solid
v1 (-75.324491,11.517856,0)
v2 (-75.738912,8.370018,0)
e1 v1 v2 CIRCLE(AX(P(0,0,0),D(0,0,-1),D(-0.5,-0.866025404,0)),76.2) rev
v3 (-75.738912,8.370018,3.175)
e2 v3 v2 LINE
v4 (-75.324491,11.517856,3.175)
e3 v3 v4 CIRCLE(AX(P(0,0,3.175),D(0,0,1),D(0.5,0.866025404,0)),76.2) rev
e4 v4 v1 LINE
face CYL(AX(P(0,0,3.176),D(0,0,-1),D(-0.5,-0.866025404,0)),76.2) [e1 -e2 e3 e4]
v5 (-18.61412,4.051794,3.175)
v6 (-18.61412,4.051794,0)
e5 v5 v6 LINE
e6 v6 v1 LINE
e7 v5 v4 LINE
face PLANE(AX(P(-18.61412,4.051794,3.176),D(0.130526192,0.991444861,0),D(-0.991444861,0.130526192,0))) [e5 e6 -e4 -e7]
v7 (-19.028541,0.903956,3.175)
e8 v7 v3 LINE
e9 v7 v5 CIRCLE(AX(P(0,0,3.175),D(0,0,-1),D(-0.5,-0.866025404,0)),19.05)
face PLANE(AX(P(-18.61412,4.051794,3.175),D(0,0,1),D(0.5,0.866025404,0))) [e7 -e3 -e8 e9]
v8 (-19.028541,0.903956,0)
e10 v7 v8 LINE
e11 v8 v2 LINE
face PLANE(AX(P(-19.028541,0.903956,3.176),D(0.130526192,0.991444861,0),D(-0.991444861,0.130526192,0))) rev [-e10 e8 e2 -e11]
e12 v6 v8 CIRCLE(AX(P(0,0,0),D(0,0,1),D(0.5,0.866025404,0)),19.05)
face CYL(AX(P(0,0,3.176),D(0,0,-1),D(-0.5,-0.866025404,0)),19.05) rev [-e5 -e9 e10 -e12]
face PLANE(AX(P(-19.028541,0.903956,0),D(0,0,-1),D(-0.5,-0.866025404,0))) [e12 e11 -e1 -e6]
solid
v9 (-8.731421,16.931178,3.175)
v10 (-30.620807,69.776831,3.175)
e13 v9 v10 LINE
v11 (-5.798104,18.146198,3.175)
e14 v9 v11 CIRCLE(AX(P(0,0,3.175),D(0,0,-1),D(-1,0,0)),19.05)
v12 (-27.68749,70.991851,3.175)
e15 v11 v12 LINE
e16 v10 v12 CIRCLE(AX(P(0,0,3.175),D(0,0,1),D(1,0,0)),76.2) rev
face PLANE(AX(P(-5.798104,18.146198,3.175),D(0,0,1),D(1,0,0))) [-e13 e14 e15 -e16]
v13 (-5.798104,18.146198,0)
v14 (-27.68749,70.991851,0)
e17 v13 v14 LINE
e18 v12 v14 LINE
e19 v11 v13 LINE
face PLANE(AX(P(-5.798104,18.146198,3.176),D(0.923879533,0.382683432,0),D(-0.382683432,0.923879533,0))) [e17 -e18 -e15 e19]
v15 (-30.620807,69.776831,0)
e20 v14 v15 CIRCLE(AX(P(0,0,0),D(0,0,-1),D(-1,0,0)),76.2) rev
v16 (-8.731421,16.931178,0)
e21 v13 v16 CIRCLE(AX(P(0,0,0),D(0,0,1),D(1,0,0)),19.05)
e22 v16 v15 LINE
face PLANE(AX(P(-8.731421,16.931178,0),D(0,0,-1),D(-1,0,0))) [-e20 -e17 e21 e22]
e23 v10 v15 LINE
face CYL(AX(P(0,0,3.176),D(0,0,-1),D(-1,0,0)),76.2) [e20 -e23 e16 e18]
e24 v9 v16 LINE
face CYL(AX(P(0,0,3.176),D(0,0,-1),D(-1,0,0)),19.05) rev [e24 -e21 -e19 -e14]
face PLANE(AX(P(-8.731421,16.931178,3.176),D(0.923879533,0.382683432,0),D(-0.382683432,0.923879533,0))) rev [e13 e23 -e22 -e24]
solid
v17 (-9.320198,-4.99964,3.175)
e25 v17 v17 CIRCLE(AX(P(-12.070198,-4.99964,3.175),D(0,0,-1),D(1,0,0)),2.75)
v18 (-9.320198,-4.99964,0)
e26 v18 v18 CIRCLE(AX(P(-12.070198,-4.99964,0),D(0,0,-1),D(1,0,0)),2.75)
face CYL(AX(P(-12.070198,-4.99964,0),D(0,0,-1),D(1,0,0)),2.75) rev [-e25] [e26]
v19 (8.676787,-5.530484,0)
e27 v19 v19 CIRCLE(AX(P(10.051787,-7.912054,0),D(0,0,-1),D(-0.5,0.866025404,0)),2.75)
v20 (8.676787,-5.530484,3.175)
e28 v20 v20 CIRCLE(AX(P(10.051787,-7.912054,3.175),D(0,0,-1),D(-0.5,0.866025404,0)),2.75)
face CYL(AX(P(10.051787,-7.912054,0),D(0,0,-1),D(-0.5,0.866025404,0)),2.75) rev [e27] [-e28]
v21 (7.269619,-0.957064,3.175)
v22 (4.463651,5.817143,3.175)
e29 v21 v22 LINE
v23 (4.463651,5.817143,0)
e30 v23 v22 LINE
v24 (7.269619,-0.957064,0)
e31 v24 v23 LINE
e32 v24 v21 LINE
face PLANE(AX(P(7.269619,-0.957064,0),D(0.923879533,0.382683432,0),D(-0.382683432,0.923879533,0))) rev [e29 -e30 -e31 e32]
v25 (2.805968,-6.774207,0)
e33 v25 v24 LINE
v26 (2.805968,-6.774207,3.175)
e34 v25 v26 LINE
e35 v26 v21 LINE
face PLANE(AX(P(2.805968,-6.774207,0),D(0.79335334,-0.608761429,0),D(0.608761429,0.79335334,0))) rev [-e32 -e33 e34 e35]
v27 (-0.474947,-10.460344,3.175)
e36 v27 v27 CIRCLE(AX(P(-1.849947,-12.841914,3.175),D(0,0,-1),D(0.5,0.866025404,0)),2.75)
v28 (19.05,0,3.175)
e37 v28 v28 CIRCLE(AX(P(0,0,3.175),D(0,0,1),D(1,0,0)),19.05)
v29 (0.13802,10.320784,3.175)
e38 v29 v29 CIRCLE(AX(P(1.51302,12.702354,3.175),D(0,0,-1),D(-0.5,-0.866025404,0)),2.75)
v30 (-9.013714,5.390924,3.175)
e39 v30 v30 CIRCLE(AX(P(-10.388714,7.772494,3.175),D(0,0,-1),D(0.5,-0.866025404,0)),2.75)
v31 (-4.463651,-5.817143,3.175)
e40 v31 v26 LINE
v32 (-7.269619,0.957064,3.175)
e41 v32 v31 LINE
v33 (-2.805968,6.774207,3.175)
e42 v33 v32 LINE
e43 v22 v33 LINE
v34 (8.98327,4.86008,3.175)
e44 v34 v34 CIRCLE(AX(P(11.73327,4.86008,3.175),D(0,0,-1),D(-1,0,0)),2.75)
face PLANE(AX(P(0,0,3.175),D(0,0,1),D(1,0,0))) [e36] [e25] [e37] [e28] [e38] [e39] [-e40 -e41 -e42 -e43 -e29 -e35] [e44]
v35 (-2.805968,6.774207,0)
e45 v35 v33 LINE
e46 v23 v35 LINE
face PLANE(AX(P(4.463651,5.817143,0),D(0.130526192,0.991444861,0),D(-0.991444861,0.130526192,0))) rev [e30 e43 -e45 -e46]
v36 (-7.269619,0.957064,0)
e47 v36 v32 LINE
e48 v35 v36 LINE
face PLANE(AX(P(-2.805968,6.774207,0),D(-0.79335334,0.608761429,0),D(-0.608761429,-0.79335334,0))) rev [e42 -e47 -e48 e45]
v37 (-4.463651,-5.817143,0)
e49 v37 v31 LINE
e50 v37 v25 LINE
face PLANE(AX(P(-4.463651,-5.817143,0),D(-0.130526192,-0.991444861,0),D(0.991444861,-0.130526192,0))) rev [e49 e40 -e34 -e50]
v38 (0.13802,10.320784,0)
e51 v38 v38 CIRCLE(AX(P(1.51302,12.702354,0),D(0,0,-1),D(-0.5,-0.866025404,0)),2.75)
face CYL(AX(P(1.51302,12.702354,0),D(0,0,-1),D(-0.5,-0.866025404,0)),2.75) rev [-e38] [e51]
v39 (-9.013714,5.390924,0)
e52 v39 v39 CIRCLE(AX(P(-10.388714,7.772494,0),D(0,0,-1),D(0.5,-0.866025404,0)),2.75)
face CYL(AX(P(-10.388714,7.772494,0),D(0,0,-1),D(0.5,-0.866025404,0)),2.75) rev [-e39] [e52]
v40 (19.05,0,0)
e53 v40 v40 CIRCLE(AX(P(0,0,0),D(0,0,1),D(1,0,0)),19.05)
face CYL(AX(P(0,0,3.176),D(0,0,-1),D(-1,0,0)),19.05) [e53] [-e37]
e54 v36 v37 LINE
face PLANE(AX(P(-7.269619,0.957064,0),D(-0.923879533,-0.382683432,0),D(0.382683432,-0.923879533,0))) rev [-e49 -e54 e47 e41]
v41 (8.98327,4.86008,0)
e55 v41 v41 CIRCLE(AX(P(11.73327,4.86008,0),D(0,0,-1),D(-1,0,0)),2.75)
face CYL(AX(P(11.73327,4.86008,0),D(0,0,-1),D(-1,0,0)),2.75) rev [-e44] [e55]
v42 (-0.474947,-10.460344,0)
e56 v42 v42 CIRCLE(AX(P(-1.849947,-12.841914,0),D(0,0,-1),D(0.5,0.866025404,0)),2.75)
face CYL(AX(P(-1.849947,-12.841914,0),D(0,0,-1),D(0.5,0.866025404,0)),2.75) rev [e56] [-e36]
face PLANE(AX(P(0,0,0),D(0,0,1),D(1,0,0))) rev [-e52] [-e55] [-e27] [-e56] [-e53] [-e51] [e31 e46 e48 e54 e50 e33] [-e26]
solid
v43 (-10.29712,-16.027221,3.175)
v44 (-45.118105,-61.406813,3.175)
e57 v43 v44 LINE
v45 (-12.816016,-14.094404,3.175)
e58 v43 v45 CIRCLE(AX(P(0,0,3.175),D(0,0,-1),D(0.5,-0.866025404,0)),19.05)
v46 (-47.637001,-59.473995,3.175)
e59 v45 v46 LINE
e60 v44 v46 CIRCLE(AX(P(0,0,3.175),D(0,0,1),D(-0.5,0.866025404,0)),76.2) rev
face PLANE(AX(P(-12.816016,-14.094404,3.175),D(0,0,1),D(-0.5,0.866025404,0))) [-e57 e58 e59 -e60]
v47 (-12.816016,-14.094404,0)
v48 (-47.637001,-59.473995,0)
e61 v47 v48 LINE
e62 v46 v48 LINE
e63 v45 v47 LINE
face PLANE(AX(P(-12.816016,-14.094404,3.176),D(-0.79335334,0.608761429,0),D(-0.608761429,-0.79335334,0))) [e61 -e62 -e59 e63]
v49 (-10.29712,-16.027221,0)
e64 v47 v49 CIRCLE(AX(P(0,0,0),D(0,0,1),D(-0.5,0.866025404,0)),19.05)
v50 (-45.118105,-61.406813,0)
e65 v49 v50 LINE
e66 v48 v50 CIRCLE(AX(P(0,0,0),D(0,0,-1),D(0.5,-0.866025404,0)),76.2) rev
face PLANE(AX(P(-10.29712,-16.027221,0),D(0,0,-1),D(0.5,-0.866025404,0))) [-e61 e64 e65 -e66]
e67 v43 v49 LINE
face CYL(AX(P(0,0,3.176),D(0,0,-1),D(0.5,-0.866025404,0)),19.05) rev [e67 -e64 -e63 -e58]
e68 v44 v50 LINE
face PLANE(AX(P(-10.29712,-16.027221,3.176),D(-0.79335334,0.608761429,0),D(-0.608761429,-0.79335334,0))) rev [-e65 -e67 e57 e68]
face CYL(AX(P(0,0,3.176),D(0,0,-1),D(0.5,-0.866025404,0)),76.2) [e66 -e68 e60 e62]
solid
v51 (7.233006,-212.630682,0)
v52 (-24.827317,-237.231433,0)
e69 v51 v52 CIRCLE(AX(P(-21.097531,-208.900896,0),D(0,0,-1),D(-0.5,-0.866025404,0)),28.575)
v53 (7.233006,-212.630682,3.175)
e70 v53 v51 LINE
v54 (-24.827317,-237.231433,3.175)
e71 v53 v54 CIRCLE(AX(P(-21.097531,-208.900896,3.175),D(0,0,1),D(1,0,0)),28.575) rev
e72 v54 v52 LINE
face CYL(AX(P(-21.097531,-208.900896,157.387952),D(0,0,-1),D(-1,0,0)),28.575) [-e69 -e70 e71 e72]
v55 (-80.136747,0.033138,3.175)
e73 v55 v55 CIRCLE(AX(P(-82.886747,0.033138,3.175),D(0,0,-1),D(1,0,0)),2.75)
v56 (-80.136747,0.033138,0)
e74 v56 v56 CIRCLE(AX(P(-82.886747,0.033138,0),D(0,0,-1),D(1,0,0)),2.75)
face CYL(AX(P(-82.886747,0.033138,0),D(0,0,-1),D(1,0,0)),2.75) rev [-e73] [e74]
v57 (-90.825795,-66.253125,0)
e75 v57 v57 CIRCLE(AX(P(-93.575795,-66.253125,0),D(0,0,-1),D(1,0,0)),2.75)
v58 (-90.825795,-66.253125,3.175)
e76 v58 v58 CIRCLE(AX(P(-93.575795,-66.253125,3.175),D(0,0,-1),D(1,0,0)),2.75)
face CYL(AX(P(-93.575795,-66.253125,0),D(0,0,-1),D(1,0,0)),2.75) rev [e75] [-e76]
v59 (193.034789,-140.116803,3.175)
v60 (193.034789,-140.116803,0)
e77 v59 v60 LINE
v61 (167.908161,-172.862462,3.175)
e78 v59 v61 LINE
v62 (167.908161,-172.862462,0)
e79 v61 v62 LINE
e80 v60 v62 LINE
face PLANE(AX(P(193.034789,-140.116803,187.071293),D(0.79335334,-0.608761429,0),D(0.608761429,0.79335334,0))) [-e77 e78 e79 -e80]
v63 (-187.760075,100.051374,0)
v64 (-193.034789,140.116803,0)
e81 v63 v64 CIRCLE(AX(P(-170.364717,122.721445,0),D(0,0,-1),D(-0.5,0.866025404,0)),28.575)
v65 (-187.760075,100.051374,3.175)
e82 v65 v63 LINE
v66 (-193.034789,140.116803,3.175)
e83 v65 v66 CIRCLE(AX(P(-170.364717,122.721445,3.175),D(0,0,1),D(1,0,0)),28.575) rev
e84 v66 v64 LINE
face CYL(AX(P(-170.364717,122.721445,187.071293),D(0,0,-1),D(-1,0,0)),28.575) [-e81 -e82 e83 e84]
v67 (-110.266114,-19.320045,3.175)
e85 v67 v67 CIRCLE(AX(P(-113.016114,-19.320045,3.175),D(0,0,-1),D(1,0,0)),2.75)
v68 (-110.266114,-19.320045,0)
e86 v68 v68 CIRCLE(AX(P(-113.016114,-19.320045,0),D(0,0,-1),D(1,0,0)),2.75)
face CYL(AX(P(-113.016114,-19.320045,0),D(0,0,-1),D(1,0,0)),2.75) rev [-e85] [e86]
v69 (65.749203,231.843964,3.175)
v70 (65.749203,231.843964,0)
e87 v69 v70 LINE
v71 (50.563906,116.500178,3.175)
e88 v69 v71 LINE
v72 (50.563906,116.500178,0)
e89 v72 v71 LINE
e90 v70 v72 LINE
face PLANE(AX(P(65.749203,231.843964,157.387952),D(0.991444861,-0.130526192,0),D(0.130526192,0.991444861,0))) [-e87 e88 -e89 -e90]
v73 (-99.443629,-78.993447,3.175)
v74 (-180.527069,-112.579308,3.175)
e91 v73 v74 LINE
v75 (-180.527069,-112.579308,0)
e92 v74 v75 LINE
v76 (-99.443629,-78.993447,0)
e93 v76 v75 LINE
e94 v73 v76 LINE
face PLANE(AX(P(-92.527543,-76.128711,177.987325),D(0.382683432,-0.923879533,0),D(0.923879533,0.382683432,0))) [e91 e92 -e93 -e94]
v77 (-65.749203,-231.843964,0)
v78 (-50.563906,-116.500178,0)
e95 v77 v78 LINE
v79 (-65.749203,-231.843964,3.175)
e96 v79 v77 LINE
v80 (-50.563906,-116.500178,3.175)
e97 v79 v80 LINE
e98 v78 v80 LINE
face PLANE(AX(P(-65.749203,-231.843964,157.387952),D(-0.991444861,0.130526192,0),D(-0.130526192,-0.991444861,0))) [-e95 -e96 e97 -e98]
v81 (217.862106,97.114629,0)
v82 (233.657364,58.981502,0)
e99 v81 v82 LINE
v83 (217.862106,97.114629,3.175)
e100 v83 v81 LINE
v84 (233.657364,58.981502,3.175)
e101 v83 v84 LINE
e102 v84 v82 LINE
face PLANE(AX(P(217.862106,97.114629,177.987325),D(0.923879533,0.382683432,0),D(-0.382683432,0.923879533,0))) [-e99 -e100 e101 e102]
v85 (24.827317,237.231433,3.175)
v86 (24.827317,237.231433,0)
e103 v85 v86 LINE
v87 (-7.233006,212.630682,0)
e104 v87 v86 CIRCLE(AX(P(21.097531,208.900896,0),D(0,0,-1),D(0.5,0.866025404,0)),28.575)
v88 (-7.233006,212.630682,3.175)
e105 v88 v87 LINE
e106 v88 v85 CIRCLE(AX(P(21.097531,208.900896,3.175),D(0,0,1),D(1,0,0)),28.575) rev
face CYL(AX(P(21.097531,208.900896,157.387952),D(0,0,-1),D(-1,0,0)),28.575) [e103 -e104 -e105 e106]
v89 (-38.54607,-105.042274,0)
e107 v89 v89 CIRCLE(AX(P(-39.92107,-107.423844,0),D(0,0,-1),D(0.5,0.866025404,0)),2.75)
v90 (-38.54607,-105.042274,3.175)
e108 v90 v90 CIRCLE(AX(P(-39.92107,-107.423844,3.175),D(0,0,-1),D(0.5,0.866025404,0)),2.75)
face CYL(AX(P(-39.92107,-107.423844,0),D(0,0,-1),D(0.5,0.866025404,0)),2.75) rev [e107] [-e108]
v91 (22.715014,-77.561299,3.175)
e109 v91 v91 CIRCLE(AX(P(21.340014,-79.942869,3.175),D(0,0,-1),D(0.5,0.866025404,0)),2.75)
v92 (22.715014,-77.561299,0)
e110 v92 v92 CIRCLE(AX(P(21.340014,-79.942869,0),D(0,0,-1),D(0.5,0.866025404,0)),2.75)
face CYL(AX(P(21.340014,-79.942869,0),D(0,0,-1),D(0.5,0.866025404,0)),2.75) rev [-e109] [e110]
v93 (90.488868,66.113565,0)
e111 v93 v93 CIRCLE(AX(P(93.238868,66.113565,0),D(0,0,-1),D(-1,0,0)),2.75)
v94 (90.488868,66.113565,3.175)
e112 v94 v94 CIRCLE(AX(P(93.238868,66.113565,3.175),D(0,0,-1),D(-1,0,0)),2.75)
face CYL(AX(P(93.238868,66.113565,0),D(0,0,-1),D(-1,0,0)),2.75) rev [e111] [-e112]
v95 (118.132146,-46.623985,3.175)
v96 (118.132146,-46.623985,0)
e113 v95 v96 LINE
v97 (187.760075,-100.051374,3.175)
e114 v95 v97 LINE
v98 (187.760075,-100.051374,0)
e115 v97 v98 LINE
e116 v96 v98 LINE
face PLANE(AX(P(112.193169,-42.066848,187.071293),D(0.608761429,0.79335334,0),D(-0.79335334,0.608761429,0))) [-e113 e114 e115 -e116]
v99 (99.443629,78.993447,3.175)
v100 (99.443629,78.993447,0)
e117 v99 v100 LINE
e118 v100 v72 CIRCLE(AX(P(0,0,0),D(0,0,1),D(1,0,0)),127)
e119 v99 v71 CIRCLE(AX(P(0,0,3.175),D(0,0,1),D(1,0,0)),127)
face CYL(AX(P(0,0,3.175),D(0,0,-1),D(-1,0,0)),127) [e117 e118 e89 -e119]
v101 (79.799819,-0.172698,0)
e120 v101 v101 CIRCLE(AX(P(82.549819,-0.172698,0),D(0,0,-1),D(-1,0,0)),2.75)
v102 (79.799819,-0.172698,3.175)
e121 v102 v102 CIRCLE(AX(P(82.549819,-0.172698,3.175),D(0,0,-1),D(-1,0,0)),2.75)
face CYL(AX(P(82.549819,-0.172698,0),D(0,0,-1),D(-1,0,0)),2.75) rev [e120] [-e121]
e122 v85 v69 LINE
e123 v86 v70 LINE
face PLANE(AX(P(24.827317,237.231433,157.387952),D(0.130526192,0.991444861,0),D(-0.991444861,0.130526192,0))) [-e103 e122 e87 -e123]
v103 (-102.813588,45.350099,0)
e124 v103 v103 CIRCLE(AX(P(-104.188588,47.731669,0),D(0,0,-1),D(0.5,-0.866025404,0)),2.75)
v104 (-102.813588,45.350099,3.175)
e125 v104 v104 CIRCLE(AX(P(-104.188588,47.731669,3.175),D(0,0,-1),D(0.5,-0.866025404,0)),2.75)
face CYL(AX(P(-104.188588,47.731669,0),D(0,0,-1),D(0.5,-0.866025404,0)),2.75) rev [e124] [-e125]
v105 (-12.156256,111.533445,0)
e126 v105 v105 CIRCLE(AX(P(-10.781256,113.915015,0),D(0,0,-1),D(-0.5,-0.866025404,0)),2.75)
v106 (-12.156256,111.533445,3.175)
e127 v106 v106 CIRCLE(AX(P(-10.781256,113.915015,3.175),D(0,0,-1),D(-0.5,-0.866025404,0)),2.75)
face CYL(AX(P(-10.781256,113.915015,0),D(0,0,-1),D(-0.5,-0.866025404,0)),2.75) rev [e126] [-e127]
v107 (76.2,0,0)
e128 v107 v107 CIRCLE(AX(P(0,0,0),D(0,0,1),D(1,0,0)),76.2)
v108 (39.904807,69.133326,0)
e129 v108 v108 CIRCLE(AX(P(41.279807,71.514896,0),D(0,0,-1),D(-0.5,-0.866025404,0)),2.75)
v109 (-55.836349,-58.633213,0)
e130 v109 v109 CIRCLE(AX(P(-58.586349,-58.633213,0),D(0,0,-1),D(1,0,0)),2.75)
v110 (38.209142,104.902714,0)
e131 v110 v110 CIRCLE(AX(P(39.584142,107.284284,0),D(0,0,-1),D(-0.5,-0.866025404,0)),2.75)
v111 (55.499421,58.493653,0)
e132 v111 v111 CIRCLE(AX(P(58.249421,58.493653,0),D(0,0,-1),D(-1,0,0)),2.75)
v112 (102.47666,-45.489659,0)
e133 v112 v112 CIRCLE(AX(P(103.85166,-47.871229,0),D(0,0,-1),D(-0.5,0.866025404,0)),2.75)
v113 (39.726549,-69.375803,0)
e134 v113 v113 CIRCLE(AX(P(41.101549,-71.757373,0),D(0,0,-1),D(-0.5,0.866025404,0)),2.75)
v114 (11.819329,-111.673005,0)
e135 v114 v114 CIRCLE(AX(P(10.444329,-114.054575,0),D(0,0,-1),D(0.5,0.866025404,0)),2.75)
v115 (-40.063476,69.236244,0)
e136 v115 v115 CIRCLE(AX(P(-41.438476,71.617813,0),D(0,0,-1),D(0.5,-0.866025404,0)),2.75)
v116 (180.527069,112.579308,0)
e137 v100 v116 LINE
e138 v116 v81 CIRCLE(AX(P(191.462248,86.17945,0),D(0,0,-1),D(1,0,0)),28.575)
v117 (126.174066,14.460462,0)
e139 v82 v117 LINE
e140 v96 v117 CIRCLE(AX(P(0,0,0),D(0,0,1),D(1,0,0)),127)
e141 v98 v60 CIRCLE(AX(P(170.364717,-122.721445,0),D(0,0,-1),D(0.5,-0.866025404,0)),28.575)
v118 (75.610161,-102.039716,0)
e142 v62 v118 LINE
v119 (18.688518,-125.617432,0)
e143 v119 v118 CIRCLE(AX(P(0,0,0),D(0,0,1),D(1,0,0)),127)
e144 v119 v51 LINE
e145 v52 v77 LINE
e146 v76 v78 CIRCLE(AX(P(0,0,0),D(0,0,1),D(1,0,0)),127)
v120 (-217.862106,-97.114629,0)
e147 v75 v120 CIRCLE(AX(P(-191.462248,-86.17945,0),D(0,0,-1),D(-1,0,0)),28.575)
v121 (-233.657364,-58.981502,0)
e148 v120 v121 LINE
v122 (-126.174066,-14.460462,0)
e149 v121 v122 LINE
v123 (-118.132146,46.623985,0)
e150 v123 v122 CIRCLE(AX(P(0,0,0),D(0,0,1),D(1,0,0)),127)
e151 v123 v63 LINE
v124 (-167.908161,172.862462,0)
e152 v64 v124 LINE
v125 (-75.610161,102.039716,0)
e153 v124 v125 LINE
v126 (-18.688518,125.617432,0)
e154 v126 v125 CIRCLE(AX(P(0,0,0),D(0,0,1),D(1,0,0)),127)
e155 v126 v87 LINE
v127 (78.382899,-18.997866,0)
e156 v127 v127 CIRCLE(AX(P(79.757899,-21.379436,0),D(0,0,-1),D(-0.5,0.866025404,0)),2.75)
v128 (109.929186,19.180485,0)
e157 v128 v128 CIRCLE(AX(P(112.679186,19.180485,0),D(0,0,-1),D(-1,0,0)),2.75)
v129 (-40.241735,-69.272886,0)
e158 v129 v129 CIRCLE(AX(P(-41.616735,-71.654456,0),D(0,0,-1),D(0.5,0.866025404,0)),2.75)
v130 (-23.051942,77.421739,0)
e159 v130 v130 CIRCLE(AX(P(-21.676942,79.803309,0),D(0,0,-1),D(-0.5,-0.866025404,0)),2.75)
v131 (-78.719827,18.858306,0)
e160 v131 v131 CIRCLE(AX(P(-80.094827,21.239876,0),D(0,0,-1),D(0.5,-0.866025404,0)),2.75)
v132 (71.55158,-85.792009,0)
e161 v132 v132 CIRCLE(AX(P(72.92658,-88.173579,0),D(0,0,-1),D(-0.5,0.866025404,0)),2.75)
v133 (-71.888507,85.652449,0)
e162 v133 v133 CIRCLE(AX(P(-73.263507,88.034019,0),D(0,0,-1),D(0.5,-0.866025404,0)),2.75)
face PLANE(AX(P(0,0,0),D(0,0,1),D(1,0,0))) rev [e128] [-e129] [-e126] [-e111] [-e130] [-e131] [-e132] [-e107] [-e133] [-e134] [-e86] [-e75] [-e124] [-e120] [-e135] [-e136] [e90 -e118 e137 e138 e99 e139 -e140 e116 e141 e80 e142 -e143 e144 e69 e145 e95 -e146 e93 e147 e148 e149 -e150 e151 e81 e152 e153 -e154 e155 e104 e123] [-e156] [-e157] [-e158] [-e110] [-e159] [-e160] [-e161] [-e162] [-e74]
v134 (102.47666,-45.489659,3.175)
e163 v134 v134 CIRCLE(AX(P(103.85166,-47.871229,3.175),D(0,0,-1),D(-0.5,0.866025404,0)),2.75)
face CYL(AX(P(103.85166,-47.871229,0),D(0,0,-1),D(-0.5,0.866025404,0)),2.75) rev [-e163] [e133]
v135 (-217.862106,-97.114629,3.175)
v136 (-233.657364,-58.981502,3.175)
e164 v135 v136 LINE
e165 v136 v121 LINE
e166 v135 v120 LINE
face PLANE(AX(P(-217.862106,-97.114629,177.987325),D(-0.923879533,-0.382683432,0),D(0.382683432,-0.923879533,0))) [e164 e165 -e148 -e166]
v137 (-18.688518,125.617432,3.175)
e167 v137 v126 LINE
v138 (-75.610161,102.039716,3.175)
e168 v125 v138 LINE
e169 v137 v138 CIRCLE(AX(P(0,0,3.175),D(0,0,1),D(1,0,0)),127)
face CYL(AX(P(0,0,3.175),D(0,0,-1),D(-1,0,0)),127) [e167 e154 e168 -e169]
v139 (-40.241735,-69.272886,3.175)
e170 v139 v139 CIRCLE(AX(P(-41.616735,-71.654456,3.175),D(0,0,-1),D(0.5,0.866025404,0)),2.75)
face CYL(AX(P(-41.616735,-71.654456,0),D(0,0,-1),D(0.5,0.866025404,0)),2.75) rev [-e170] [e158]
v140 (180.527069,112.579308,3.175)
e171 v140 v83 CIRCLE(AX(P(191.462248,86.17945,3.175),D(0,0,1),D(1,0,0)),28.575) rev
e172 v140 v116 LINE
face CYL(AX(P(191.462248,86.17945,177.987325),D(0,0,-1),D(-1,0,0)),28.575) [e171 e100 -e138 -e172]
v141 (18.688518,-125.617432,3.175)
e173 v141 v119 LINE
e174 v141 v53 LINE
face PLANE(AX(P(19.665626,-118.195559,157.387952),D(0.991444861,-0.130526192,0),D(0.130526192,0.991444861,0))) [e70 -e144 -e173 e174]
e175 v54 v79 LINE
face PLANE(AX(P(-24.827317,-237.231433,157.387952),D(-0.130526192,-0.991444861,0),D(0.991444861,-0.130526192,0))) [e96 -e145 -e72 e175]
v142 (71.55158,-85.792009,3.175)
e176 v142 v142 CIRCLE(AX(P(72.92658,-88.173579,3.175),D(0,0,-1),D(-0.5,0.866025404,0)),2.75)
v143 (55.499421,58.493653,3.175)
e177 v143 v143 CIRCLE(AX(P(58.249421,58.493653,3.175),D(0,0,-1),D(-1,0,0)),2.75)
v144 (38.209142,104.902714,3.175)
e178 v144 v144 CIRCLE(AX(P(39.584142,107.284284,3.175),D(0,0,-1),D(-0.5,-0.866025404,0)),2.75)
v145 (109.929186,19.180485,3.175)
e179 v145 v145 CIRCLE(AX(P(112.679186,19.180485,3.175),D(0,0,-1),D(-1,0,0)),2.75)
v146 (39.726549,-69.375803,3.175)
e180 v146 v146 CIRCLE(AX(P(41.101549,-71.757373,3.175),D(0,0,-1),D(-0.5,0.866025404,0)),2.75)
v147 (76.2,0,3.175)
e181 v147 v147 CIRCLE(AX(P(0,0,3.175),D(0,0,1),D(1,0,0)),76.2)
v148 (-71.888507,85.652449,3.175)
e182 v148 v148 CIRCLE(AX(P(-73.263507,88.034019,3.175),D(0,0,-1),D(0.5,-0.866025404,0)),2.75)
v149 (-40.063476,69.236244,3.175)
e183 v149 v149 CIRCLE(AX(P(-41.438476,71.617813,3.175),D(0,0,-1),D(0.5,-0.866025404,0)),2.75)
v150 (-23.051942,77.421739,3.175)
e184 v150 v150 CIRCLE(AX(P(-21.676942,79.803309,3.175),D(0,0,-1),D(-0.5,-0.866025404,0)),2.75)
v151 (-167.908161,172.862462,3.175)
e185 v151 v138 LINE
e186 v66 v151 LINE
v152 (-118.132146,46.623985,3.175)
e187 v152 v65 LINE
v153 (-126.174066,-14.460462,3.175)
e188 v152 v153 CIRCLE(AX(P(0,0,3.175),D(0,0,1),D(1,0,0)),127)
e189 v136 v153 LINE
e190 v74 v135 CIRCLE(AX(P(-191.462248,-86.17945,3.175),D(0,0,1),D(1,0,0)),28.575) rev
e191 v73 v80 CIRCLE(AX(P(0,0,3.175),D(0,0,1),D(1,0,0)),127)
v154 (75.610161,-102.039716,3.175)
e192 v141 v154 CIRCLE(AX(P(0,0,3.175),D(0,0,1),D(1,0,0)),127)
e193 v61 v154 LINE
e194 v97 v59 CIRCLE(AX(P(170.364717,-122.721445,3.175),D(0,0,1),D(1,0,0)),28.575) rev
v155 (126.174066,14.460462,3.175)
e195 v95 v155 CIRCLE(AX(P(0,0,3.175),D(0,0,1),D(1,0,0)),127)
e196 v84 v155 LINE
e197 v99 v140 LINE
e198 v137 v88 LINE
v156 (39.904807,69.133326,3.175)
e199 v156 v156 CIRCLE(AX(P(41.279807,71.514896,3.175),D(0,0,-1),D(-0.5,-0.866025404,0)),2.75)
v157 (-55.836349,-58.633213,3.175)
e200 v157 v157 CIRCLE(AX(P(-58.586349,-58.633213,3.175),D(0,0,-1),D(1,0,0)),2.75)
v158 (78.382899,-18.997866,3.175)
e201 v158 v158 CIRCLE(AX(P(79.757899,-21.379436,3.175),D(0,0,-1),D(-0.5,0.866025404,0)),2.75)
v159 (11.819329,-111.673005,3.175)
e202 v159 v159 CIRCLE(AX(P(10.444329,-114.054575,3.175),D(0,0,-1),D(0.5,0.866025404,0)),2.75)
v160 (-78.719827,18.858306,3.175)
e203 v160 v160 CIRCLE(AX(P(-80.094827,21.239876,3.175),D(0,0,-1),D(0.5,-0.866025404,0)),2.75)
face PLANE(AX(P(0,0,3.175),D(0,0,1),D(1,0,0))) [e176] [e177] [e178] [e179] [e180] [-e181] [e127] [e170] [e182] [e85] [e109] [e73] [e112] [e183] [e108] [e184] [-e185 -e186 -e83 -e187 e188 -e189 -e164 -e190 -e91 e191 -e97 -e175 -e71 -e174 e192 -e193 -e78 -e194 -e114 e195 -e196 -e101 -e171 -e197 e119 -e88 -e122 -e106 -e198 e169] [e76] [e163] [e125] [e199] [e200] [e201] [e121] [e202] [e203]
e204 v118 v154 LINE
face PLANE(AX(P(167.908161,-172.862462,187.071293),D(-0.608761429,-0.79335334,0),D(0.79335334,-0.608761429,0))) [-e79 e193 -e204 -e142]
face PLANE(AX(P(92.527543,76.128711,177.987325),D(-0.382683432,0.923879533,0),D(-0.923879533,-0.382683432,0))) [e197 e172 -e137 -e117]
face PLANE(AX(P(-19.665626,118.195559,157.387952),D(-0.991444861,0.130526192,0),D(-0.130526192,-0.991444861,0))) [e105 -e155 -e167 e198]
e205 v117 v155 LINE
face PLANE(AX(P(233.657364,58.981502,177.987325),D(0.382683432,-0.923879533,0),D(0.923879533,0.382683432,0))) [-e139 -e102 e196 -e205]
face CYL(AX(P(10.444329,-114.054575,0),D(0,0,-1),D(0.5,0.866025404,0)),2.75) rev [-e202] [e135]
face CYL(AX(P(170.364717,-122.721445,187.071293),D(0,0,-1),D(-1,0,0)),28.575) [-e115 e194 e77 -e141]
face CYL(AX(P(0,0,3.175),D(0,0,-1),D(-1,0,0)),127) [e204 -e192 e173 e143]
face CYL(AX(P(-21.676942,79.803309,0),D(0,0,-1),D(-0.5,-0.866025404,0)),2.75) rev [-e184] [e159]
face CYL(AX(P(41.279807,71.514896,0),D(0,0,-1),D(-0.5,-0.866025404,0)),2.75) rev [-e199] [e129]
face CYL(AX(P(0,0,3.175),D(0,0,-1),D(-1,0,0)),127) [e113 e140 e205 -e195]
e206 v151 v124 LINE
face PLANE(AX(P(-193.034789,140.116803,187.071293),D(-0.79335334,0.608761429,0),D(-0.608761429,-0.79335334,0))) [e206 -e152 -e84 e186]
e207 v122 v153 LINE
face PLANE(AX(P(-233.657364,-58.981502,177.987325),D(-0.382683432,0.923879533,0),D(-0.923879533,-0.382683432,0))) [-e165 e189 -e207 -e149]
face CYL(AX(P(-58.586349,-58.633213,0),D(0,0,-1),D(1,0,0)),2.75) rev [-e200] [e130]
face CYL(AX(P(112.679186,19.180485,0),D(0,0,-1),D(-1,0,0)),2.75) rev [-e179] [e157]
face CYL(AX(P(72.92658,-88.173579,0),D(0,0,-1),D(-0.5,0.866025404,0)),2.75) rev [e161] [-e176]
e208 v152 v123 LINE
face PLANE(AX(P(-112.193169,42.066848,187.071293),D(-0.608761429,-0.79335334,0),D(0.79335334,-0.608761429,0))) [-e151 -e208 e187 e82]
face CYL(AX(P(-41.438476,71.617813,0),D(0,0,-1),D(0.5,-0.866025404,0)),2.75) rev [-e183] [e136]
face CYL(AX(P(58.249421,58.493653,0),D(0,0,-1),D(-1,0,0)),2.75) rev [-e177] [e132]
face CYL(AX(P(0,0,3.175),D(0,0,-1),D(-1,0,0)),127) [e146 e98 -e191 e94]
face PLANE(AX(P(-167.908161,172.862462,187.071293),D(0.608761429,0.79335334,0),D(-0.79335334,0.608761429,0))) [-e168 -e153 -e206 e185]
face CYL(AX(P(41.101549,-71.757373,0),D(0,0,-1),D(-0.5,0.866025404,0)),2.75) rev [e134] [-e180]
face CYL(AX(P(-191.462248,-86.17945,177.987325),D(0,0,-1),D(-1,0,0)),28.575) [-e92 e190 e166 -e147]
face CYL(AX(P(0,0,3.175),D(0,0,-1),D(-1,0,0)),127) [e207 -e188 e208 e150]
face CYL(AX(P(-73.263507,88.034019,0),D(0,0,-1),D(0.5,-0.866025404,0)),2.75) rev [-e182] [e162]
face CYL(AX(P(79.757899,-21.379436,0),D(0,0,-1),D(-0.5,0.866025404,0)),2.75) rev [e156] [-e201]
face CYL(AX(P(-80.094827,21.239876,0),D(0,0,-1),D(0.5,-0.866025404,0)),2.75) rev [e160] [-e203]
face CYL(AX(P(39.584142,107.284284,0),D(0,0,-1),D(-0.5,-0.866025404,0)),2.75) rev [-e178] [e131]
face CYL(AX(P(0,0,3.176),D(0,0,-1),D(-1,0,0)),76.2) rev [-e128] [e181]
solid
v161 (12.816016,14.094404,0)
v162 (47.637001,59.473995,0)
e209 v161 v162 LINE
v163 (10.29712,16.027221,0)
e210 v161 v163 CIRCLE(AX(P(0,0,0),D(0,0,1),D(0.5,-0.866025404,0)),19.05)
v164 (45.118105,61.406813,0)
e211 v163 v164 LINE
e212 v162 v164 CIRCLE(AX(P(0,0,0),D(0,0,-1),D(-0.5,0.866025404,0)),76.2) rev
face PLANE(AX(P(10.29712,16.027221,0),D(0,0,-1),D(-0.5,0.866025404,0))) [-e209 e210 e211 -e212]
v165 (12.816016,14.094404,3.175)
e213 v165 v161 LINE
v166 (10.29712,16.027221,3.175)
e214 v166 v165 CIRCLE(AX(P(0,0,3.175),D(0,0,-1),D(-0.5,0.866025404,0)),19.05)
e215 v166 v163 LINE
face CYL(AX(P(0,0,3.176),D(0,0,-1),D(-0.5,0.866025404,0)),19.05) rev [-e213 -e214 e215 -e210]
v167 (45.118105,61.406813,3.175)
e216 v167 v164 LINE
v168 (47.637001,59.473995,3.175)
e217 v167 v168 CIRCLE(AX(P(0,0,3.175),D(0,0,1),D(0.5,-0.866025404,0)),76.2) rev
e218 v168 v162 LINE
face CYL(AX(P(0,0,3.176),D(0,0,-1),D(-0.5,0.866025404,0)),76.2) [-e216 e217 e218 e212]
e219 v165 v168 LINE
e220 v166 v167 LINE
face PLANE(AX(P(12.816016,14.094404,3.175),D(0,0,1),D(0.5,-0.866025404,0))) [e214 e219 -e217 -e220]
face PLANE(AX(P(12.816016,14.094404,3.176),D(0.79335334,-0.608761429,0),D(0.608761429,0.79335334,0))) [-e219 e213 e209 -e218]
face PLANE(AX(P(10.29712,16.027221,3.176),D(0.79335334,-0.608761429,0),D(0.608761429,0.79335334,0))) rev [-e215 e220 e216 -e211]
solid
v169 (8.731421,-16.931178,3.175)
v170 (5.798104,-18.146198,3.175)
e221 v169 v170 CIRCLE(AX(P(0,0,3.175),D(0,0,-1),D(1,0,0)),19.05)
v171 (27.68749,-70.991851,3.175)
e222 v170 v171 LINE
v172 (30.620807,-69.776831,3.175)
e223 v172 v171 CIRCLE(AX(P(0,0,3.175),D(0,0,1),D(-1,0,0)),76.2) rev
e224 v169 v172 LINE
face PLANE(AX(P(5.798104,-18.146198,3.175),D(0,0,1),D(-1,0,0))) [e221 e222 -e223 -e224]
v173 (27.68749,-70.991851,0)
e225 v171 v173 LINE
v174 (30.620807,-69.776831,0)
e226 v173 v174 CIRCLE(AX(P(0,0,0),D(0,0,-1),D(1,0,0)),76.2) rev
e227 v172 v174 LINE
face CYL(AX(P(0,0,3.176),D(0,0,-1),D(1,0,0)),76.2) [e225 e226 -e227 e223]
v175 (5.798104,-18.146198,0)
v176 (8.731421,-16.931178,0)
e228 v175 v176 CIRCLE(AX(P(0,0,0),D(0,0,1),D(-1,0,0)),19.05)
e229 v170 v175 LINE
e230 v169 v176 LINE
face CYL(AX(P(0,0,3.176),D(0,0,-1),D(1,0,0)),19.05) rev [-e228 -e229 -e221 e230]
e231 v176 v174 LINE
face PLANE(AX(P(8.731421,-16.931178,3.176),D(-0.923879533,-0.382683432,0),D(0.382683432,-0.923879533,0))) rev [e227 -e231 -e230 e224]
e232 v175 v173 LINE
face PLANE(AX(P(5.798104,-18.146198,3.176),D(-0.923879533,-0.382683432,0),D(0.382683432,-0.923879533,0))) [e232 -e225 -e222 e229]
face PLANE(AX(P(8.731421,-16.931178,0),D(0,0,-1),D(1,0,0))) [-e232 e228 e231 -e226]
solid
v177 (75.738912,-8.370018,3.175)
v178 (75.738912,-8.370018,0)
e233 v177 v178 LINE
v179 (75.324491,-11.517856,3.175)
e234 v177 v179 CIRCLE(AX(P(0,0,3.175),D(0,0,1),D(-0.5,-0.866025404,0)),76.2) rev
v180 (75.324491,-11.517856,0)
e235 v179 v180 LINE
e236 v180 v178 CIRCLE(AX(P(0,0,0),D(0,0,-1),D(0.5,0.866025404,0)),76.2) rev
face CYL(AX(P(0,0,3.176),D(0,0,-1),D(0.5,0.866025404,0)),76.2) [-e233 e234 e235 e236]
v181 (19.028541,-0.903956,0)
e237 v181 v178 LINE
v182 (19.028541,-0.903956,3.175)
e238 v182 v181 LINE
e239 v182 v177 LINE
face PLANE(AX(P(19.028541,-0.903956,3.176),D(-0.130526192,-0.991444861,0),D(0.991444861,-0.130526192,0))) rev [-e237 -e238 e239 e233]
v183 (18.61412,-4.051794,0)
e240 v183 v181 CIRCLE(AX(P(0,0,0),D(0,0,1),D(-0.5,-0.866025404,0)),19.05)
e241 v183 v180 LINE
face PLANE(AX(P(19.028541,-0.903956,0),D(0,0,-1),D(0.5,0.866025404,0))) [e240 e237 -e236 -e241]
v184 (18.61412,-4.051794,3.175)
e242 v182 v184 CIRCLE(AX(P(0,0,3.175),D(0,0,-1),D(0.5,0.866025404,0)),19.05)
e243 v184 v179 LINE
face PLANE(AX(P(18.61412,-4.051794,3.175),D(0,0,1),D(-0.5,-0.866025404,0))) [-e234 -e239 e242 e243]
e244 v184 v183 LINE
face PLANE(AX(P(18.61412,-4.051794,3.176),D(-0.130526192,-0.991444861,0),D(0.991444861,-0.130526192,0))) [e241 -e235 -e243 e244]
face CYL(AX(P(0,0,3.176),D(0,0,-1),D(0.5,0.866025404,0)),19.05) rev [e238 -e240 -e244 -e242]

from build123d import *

# Parameters (mm, degrees)
SKETCH1_R            = 127
BOSS_EXTRUDE1_DEPTH  = 3.175
M5_CLEARANCE_HOLE1_D = 5.5
CIRPATTERN1_COUNT    = 6
BOSS_EXTRUDE2_DEPTH  = 3.175
CIRPATTERN2_COUNT    = 6
CUT_EXTRUDE1_REACH   = 335.168
SKETCH7_R            = 76.2
SKETCH7_R_2          = 19.05
BOSS_EXTRUDE8_DEPTH  = 3.175
CIRPATTERN4_COUNT    = 6
CUT_EXTRUDE2_DEPTH   = 334.167593846


# Read off the part's stored shape, not the designer's step: Boss-Extrude8
with BuildPart() as part:
    # Sketch1 → Boss-Extrude1 (new body)
    with BuildSketch(Plane.XY):
        Circle(SKETCH1_R)
    extrude(amount=BOSS_EXTRUDE1_DEPTH)

    # M5 Clearance Hole1 (through all)
    with Locations(Plane(origin=(0, 0, 0), x_dir=(-1, 0, 0), z_dir=(0, 0, -1))):
        with Locations((-58.2494214, 58.493652703), (-82.549819355, -0.172697611), (-93.238867767, 66.113565457), (-112.679186132, 19.180485205), (-11.733270063, 4.860079591)):
            m5_clearance_hole1 = Hole(M5_CLEARANCE_HOLE1_D / 2)

    # CirPattern1: M5 Clearance Hole1 ×6 about axis
    cirpattern1_axis = Axis((-0.168463788, -0.069779986, 0), (0, 0, 1))
    for i in range(1, CIRPATTERN1_COUNT):
        add(m5_clearance_hole1.rotate(cirpattern1_axis, i * 360 / CIRPATTERN1_COUNT), mode=Mode.SUBTRACT)

    # Sketch6 → Boss-Extrude2 (add)
    with BuildSketch(Plane(origin=(0, 0, 0), x_dir=(-1, 0, 0), z_dir=(0, 0, -1))):
        with BuildLine():
            Line((-92.527543442, 76.128710982), (-180.527068914, 112.579307915))
            ThreePointArc((-180.527068914, 112.579307915), (-202.397427074, 112.579307915), (-217.862105635, 97.114629353))
            Line((-217.862105635, 97.114629353), (-233.657364306, 58.981501649))
            Line((-233.657364306, 58.981501649), (-119.257981193, 11.595725636))
            Line((-119.257981193, 11.595725636), (-92.527543442, 76.128710982))
        make_face()
    boss_extrude2 = extrude(amount=-BOSS_EXTRUDE2_DEPTH)

    # CirPattern2: Boss-Extrude2 ×6 about axis
    cirpattern2_axis = Axis((0, 0, 0), (0, 0, 1))
    for i in range(1, CIRPATTERN2_COUNT):
        add(boss_extrude2.rotate(cirpattern2_axis, i * 360 / CIRPATTERN2_COUNT))

    # Sketch7 → Cut-Extrude1 (cut, up to next)
    with BuildSketch(Plane.XY, mode=Mode.PRIVATE) as cut_extrude1_sk1:
        Circle(SKETCH7_R)
        Circle(SKETCH7_R_2, mode=Mode.SUBTRACT)
    cut_extrude1_tool1 = extrude(cut_extrude1_sk1.sketch, amount=CUT_EXTRUDE1_REACH, mode=Mode.PRIVATE) & part.part
    add(cut_extrude1_tool1.solids().sort_by_distance((-74.044739, 0, 0))[0], mode=Mode.SUBTRACT)


with BuildPart() as cut_extrude1_piece_1:
    # of the separate pieces the step leaves, piece 1, a body of its own (cut_extrude1_pieces)
    add(part.part.solids().sort_by_distance((99.443628683, 78.993447287, 0))[0])


with BuildPart() as cut_extrude1_piece_2:
    # of the separate pieces the step leaves, piece 2, a body of its own (cut_extrude1_pieces)
    add(part.part.solids().sort_by_distance((19.05, 0, 0))[0])

    # Sketch16 → Cut-Extrude2 (cut, through all)
    with BuildSketch(Plane.XY.offset(3.175)):
        Polygon((2.80596826, -6.774206629), (7.269619162, -0.957063519), (4.463650901, 5.81714311), (-2.80596826, 6.774206629), (-7.269619162, 0.957063519), (-4.463650901, -5.81714311), align=None)
    extrude(amount=-CUT_EXTRUDE2_DEPTH, mode=Mode.SUBTRACT)


with BuildPart() as body_3:
    # Boss-Extrude8 outline → Boss-Extrude8 (new body)
    with BuildSketch(Plane.XY):
        with BuildLine():
            Line((-30.620807389, 69.776831075), (-8.731421131, 16.931177899))
            ThreePointArc((-8.731421131, 16.931177899), (-7.290119387, 17.599905094), (-5.798103615, 18.146197797))
            Line((-5.798103615, 18.146197797), (-27.687489873, 70.991850973))
            ThreePointArc((-27.687489873, 70.991850973), (-29.160477546, 70.399620377), (-30.620807389, 69.776831075))
        make_face()
    extrude(amount=BOSS_EXTRUDE8_DEPTH)


with BuildPart() as cirpattern4_1:
    # CirPattern4: pattern copy
    add(body_3.part.rotate(Axis((0, 0, 0), (0, 0, 1)), 1 * 360 / CIRPATTERN4_COUNT))


with BuildPart() as cirpattern4_2:
    # CirPattern4: pattern copy
    add(body_3.part.rotate(Axis((0, 0, 0), (0, 0, 1)), 2 * 360 / CIRPATTERN4_COUNT))


with BuildPart() as cirpattern4_3:
    # CirPattern4: pattern copy
    add(body_3.part.rotate(Axis((0, 0, 0), (0, 0, 1)), 3 * 360 / CIRPATTERN4_COUNT))


with BuildPart() as cirpattern4_4:
    # CirPattern4: pattern copy
    add(body_3.part.rotate(Axis((0, 0, 0), (0, 0, 1)), 4 * 360 / CIRPATTERN4_COUNT))


with BuildPart() as cirpattern4_5:
    # CirPattern4: pattern copy
    add(body_3.part.rotate(Axis((0, 0, 0), (0, 0, 1)), 5 * 360 / CIRPATTERN4_COUNT))


solid = Compound([cut_extrude1_piece_1.part, cut_extrude1_piece_2.part, body_3.part, cirpattern4_1.part, cirpattern4_2.part, cirpattern4_3.part, cirpattern4_4.part, cirpattern4_5.part])
